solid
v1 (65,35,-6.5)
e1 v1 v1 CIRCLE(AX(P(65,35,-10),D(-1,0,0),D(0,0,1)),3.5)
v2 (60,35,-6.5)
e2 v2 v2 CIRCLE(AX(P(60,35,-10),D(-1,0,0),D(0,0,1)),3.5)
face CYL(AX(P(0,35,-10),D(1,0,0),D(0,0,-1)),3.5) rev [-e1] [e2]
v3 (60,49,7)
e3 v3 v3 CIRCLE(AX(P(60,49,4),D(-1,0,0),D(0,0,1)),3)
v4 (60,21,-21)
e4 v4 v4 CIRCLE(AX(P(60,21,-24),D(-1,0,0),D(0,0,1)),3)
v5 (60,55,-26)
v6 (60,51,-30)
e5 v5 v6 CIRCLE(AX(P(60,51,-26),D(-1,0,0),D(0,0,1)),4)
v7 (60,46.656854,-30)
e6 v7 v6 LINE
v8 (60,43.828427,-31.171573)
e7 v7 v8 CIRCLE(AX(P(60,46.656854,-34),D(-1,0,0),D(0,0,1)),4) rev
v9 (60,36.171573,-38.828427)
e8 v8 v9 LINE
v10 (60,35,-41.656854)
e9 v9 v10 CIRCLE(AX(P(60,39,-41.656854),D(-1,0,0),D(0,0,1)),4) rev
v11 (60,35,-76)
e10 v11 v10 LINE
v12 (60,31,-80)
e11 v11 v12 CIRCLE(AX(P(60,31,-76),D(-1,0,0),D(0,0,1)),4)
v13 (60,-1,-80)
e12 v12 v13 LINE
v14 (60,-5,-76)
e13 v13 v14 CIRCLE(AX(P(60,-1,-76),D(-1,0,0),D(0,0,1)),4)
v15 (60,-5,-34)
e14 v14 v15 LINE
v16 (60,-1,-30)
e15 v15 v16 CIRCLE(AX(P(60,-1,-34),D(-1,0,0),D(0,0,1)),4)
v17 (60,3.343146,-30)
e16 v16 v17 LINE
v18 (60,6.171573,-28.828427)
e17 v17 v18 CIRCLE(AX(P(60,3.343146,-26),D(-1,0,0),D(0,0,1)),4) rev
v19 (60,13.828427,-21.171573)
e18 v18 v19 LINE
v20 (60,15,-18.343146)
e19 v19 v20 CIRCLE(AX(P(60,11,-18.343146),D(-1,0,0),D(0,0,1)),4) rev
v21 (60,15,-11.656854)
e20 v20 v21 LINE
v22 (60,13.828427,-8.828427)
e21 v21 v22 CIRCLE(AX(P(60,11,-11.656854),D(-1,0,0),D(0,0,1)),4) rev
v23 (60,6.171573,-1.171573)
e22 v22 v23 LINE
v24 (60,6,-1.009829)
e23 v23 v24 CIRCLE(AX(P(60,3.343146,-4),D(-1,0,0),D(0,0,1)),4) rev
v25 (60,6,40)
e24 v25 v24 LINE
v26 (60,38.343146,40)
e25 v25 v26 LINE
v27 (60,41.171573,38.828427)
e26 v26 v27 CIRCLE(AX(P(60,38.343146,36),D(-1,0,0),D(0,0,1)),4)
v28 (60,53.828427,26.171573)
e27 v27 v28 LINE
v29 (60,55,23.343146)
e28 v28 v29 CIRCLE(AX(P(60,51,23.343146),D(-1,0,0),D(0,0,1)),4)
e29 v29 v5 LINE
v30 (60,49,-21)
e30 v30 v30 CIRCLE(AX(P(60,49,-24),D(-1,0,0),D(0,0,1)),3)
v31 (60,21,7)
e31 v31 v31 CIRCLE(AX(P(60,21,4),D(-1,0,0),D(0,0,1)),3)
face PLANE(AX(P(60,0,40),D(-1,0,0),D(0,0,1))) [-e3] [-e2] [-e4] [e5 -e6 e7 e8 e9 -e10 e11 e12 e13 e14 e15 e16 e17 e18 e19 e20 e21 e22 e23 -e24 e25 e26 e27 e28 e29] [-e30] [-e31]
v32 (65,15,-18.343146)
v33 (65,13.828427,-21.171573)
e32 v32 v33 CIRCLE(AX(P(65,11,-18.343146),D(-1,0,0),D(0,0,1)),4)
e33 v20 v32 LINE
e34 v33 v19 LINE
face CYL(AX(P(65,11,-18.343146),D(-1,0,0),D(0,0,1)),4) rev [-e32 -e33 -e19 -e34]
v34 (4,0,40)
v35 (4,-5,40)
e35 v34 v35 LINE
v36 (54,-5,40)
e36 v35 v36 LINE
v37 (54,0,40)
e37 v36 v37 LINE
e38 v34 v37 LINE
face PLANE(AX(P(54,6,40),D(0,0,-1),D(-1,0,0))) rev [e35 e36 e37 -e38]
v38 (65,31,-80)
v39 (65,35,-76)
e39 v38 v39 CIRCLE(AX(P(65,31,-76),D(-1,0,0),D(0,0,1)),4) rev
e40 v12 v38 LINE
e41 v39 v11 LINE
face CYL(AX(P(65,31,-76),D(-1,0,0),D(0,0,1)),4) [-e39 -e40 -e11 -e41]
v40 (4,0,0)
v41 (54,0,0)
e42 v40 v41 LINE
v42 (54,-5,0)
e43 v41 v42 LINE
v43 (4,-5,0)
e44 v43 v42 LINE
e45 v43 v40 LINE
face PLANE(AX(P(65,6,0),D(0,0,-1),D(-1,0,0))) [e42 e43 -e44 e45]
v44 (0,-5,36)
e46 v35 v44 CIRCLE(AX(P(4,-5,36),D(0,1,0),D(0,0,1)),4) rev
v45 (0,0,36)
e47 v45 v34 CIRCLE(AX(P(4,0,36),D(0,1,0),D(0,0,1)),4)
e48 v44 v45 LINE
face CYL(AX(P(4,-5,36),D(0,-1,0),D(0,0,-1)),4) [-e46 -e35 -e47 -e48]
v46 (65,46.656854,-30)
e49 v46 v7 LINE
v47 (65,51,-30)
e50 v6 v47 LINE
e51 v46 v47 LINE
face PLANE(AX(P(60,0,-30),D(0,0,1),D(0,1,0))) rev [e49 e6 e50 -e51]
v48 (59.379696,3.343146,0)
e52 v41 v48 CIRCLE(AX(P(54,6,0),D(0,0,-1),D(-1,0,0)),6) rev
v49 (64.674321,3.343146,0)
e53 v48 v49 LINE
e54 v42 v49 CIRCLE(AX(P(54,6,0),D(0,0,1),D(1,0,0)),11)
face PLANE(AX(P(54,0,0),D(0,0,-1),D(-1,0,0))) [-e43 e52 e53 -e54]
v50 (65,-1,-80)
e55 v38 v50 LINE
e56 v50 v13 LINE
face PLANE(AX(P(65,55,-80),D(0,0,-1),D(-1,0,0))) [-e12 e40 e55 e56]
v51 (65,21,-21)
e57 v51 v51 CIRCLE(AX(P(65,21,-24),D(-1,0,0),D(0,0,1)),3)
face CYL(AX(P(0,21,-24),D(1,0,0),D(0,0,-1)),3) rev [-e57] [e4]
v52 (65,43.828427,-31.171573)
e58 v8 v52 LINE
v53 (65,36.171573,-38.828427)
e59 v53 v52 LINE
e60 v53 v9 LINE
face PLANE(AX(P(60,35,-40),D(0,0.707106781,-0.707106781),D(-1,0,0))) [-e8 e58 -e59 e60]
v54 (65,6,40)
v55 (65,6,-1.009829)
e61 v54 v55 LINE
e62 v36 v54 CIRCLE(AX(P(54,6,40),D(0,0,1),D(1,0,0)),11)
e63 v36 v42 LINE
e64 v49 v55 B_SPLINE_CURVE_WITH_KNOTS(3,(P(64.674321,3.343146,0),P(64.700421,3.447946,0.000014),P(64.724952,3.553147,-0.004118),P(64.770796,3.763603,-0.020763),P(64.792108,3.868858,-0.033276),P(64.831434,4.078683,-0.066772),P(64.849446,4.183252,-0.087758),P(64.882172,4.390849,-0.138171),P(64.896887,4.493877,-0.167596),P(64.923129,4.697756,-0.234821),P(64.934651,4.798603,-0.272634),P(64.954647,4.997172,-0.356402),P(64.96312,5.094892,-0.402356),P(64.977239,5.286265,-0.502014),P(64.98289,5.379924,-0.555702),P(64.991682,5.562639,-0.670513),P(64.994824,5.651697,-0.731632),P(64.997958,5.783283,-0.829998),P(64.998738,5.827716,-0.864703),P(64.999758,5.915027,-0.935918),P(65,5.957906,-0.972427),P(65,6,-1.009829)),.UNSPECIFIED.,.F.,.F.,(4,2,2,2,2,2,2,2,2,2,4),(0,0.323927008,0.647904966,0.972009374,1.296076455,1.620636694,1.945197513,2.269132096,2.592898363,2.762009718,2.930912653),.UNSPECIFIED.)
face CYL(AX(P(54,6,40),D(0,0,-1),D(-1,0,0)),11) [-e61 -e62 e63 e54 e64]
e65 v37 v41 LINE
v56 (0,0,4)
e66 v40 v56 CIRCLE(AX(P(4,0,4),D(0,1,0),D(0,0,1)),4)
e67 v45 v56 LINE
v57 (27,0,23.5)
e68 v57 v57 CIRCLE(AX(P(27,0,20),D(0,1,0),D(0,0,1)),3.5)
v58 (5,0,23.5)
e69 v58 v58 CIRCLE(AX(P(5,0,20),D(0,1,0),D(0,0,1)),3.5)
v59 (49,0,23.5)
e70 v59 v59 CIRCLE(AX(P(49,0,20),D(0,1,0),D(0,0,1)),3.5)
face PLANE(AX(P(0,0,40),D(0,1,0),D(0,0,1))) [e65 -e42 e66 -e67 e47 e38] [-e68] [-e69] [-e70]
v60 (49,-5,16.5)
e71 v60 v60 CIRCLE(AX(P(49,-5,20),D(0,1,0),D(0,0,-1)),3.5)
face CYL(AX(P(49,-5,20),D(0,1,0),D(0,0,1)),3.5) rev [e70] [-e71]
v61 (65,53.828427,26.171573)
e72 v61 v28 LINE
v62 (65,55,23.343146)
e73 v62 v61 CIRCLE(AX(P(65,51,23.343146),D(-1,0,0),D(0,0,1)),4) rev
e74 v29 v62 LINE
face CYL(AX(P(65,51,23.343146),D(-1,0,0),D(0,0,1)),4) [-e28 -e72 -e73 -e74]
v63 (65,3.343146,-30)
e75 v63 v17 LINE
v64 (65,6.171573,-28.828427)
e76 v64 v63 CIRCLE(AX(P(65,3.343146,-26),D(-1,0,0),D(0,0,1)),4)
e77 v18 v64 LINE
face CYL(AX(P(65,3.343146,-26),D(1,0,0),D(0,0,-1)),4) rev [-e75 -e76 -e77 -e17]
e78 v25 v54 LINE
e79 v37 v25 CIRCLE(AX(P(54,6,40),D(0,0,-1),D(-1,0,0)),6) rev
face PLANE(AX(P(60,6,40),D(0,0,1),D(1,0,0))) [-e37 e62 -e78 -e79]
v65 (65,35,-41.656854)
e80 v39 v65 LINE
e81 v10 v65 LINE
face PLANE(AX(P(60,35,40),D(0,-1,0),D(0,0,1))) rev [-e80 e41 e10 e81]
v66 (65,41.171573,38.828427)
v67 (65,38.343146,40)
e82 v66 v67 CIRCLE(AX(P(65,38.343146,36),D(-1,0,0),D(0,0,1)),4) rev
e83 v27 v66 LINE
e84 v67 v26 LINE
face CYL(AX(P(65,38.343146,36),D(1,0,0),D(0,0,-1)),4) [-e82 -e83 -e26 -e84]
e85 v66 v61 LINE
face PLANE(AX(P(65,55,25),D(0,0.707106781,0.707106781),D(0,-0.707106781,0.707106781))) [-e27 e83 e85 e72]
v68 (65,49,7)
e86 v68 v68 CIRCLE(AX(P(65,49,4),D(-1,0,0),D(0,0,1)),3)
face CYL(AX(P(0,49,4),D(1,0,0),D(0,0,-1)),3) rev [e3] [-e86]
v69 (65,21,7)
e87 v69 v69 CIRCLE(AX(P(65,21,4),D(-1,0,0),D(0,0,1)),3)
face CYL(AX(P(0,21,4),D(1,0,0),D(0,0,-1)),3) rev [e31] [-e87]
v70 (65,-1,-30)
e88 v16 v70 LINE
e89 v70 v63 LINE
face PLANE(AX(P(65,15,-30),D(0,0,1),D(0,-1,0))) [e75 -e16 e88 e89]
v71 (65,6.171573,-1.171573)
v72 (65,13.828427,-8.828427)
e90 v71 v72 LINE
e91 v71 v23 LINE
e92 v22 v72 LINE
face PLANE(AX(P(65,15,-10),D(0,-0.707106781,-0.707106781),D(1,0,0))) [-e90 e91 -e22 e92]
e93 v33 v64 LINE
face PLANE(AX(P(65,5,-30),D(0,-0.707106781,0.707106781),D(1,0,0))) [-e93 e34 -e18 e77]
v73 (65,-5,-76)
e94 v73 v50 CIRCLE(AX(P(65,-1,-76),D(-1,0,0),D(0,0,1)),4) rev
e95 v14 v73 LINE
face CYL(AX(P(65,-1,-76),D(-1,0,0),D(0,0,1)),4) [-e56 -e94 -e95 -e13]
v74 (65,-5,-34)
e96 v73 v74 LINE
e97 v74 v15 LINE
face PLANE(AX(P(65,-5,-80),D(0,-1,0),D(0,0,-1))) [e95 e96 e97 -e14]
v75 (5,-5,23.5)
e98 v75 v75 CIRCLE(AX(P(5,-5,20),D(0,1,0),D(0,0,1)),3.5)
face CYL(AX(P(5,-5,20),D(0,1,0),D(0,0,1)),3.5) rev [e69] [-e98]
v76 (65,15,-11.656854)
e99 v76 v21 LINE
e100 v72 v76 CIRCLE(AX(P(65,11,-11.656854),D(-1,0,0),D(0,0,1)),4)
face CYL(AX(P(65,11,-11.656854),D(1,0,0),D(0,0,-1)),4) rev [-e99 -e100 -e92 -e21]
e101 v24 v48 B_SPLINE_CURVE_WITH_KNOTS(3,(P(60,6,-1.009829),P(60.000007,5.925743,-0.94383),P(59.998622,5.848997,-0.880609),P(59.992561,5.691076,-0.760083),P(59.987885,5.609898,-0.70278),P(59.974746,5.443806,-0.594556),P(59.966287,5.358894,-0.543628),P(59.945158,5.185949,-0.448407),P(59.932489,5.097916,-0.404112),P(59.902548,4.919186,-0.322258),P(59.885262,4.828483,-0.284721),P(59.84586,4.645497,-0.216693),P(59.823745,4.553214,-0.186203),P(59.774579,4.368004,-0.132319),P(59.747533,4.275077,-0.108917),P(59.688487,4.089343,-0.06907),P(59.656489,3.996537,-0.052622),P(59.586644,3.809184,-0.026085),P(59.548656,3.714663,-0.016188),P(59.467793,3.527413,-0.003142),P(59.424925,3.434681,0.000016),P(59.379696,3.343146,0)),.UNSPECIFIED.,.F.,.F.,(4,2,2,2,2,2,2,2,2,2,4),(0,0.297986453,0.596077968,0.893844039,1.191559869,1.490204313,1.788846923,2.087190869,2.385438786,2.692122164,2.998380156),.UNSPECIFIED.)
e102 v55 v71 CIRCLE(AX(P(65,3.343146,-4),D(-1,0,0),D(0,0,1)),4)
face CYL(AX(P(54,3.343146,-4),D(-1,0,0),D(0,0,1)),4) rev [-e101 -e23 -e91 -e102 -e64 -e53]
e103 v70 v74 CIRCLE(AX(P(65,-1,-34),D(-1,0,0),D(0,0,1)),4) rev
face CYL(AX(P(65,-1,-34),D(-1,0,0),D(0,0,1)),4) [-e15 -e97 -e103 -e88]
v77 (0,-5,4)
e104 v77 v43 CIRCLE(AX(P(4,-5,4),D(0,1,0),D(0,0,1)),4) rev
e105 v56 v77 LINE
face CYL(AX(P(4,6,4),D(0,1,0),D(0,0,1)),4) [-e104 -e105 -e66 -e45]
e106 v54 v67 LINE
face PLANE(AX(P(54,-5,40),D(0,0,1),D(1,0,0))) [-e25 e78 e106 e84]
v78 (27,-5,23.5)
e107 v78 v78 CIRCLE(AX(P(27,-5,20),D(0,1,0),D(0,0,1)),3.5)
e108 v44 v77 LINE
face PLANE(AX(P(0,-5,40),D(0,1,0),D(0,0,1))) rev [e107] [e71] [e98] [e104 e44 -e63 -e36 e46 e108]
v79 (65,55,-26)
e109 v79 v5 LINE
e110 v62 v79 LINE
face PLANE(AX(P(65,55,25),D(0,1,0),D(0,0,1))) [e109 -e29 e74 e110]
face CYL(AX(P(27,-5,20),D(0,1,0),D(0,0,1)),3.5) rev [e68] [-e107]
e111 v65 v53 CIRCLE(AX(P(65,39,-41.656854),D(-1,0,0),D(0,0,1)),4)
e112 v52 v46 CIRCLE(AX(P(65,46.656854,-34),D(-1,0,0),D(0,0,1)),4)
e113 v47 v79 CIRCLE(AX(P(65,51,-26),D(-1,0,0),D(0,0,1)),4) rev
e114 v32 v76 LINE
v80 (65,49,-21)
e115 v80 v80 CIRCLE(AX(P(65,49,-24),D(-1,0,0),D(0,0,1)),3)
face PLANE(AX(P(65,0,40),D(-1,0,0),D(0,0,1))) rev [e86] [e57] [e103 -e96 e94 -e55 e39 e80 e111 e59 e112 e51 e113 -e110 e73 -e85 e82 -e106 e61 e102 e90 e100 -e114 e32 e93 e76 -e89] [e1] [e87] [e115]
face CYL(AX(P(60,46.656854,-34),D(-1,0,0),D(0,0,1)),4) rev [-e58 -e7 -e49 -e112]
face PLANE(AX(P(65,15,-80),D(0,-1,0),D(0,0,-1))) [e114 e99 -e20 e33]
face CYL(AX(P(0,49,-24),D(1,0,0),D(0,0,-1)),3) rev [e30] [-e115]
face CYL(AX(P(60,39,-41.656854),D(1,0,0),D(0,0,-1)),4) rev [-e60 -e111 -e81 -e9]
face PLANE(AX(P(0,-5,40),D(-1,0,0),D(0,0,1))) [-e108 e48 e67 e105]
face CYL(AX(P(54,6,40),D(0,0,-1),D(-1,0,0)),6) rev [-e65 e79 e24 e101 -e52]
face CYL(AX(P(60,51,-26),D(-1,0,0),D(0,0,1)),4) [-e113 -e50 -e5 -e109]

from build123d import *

# Parameters (mm, degrees)
T_LE_DE_BASE_PLI_E1_DEPTH    = 40
BOSS_EXTRU_1_DEPTH           = 5
ENL_V_MAT_EXTRU_1_DEPTH      = 117.833214455
ENL_V_MAT_EXTRU_1_DEPTH_BACK = 117.833214455
ESQUISSE8_R                  = 3.5
ESQUISSE8_R_2                = 3
ESQUISSE10_W                 = 50
ESQUISSE10_H                 = 20
BOSS_EXTRU_2_DEPTH           = 5
ENL_V_MAT_EXTRU_2_DEPTH      = 117.833214455
ENL_V_MAT_EXTRU_2_DEPTH_BACK = 117.833214455
ESQUISSE9_R                  = 3.5
ENL_V_MAT_EXTRU_3_DEPTH      = 115.127122105
ENL_V_MAT_EXTRU_3_DEPTH_BACK = 115.127122105
ESQUISSE11_W                 = 50
ESQUISSE11_H                 = 20
CHANFREIN1_SIZE              = 10
CONG_1_R                     = 4


# Read off the part's stored shape, not the designer's step: Tôle de base pliée1
with BuildPart() as part:
    # Tôle de base pliée1 outline → Tôle de base pliée1 (new body)
    with BuildSketch(Plane.XY):
        with BuildLine():
            Line((65, 6), (65, 40))
            Line((65, 40), (60, 40))
            Line((60, 40), (60, 6))
            ThreePointArc((60, 6), (58.242640687, 1.757359313), (54, 0))
            Line((54, 0), (0, 0))
            Line((0, 0), (0, -5))
            Line((0, -5), (54, -5))
            ThreePointArc((54, -5), (61.778174593, -1.778174593), (65, 6))
        make_face()
    extrude(amount=T_LE_DE_BASE_PLI_E1_DEPTH)

    # Esquisse7 → Boss.-Extru.1 (add)
    with BuildSketch(Plane.ZY.offset(-60)):
        Polygon((25, 55), (-80, 55), (-80, 15), (0, 15), (40, 40), align=None)
    extrude(amount=-BOSS_EXTRU_1_DEPTH)

    # Esquisse8 → Enlèv. mat.-Extru.1 (cut, two sides: drawn at the far end of the back side and taken through both)
    with BuildSketch(Plane(origin=(65, 0, 0), x_dir=(0, 0, -1), z_dir=(1, 0, 0)).offset(-ENL_V_MAT_EXTRU_1_DEPTH_BACK)):
        with Locations(Location((10, 35, 0), (0, 0, 180))):
            Circle(ESQUISSE8_R)
        with Locations(Location((24, 49, 0), (0, 0, 180))):
            Circle(ESQUISSE8_R_2)
        with Locations(Location((24, 21, 0), (0, 0, 180))):
            Circle(ESQUISSE8_R_2)
        with Locations(Location((-4, 21, 0), (0, 0, 180))):
            Circle(ESQUISSE8_R_2)
        with Locations(Location((-4, 49, 0), (0, 0, 180))):
            Circle(ESQUISSE8_R_2)
    extrude(amount=ENL_V_MAT_EXTRU_1_DEPTH + ENL_V_MAT_EXTRU_1_DEPTH_BACK, mode=Mode.SUBTRACT)

    # Esquisse10 → Boss.-Extru.2 (add)
    with BuildSketch(Plane.ZY.offset(-60)):
        with Locations((-55, 5)):
            Rectangle(ESQUISSE10_W, ESQUISSE10_H)
    extrude(amount=-BOSS_EXTRU_2_DEPTH)

    # Esquisse9 → Enlèv. mat.-Extru.2 (cut, two sides: drawn at the far end of the back side and taken through both)
    with BuildSketch(Plane(origin=(0, 0, 0), x_dir=(1, 0, 0), z_dir=(0, 1, 0)).offset(-ENL_V_MAT_EXTRU_2_DEPTH_BACK)):
        with Locations(Location((5, -20, 0), (0, 0, 270))):
            Circle(ESQUISSE9_R)
        with Locations(Location((27, -20, 0), (0, 0, 270))):
            Circle(ESQUISSE9_R)
        with Locations(Location((49, -20, 0), (0, 0, 270))):
            Circle(ESQUISSE9_R)
    extrude(amount=ENL_V_MAT_EXTRU_2_DEPTH + ENL_V_MAT_EXTRU_2_DEPTH_BACK, mode=Mode.SUBTRACT)

    # Esquisse11 → Enlèv. mat.-Extru.3 (cut, two sides: drawn at the far end of the back side and taken through both)
    with BuildSketch(Plane.ZY.offset(-60).offset(-ENL_V_MAT_EXTRU_3_DEPTH_BACK)):
        with Locations((-55, 45)):
            Rectangle(ESQUISSE11_W, ESQUISSE11_H)
    extrude(amount=ENL_V_MAT_EXTRU_3_DEPTH + ENL_V_MAT_EXTRU_3_DEPTH_BACK, mode=Mode.SUBTRACT)

    # Chanfrein1
    chanfrein1_edges = [part.edges().sort_by_distance(p)[0] for p in [
        (62.5, 15, 0),
        (62.5, 15, -30),
        (62.5, 35, -30),
    ]]
    chamfer(chanfrein1_edges, length=CHANFREIN1_SIZE)

    # Congé1
    cong_1_edges = [part.edges().sort_by_distance(p)[0] for p in [
        (62.5, 55, -30),
        (62.5, 35, -80),
        (62.5, 35, -40),
        (62.5, 45, -30),
        (62.5, 5, -30),
        (62.5, 15, -10),
        (62.5, 15, -20),
        (62.435265467, 5, 0),
        (0, -2.5, 40),
        (62.5, 55, 25),
        (62.5, 40, 40),
        (0, -2.5, 0),
        (62.5, -5, -80),
        (62.5, -5, -30),
    ]]
    fillet(cong_1_edges, radius=CONG_1_R)


solid = part.part
